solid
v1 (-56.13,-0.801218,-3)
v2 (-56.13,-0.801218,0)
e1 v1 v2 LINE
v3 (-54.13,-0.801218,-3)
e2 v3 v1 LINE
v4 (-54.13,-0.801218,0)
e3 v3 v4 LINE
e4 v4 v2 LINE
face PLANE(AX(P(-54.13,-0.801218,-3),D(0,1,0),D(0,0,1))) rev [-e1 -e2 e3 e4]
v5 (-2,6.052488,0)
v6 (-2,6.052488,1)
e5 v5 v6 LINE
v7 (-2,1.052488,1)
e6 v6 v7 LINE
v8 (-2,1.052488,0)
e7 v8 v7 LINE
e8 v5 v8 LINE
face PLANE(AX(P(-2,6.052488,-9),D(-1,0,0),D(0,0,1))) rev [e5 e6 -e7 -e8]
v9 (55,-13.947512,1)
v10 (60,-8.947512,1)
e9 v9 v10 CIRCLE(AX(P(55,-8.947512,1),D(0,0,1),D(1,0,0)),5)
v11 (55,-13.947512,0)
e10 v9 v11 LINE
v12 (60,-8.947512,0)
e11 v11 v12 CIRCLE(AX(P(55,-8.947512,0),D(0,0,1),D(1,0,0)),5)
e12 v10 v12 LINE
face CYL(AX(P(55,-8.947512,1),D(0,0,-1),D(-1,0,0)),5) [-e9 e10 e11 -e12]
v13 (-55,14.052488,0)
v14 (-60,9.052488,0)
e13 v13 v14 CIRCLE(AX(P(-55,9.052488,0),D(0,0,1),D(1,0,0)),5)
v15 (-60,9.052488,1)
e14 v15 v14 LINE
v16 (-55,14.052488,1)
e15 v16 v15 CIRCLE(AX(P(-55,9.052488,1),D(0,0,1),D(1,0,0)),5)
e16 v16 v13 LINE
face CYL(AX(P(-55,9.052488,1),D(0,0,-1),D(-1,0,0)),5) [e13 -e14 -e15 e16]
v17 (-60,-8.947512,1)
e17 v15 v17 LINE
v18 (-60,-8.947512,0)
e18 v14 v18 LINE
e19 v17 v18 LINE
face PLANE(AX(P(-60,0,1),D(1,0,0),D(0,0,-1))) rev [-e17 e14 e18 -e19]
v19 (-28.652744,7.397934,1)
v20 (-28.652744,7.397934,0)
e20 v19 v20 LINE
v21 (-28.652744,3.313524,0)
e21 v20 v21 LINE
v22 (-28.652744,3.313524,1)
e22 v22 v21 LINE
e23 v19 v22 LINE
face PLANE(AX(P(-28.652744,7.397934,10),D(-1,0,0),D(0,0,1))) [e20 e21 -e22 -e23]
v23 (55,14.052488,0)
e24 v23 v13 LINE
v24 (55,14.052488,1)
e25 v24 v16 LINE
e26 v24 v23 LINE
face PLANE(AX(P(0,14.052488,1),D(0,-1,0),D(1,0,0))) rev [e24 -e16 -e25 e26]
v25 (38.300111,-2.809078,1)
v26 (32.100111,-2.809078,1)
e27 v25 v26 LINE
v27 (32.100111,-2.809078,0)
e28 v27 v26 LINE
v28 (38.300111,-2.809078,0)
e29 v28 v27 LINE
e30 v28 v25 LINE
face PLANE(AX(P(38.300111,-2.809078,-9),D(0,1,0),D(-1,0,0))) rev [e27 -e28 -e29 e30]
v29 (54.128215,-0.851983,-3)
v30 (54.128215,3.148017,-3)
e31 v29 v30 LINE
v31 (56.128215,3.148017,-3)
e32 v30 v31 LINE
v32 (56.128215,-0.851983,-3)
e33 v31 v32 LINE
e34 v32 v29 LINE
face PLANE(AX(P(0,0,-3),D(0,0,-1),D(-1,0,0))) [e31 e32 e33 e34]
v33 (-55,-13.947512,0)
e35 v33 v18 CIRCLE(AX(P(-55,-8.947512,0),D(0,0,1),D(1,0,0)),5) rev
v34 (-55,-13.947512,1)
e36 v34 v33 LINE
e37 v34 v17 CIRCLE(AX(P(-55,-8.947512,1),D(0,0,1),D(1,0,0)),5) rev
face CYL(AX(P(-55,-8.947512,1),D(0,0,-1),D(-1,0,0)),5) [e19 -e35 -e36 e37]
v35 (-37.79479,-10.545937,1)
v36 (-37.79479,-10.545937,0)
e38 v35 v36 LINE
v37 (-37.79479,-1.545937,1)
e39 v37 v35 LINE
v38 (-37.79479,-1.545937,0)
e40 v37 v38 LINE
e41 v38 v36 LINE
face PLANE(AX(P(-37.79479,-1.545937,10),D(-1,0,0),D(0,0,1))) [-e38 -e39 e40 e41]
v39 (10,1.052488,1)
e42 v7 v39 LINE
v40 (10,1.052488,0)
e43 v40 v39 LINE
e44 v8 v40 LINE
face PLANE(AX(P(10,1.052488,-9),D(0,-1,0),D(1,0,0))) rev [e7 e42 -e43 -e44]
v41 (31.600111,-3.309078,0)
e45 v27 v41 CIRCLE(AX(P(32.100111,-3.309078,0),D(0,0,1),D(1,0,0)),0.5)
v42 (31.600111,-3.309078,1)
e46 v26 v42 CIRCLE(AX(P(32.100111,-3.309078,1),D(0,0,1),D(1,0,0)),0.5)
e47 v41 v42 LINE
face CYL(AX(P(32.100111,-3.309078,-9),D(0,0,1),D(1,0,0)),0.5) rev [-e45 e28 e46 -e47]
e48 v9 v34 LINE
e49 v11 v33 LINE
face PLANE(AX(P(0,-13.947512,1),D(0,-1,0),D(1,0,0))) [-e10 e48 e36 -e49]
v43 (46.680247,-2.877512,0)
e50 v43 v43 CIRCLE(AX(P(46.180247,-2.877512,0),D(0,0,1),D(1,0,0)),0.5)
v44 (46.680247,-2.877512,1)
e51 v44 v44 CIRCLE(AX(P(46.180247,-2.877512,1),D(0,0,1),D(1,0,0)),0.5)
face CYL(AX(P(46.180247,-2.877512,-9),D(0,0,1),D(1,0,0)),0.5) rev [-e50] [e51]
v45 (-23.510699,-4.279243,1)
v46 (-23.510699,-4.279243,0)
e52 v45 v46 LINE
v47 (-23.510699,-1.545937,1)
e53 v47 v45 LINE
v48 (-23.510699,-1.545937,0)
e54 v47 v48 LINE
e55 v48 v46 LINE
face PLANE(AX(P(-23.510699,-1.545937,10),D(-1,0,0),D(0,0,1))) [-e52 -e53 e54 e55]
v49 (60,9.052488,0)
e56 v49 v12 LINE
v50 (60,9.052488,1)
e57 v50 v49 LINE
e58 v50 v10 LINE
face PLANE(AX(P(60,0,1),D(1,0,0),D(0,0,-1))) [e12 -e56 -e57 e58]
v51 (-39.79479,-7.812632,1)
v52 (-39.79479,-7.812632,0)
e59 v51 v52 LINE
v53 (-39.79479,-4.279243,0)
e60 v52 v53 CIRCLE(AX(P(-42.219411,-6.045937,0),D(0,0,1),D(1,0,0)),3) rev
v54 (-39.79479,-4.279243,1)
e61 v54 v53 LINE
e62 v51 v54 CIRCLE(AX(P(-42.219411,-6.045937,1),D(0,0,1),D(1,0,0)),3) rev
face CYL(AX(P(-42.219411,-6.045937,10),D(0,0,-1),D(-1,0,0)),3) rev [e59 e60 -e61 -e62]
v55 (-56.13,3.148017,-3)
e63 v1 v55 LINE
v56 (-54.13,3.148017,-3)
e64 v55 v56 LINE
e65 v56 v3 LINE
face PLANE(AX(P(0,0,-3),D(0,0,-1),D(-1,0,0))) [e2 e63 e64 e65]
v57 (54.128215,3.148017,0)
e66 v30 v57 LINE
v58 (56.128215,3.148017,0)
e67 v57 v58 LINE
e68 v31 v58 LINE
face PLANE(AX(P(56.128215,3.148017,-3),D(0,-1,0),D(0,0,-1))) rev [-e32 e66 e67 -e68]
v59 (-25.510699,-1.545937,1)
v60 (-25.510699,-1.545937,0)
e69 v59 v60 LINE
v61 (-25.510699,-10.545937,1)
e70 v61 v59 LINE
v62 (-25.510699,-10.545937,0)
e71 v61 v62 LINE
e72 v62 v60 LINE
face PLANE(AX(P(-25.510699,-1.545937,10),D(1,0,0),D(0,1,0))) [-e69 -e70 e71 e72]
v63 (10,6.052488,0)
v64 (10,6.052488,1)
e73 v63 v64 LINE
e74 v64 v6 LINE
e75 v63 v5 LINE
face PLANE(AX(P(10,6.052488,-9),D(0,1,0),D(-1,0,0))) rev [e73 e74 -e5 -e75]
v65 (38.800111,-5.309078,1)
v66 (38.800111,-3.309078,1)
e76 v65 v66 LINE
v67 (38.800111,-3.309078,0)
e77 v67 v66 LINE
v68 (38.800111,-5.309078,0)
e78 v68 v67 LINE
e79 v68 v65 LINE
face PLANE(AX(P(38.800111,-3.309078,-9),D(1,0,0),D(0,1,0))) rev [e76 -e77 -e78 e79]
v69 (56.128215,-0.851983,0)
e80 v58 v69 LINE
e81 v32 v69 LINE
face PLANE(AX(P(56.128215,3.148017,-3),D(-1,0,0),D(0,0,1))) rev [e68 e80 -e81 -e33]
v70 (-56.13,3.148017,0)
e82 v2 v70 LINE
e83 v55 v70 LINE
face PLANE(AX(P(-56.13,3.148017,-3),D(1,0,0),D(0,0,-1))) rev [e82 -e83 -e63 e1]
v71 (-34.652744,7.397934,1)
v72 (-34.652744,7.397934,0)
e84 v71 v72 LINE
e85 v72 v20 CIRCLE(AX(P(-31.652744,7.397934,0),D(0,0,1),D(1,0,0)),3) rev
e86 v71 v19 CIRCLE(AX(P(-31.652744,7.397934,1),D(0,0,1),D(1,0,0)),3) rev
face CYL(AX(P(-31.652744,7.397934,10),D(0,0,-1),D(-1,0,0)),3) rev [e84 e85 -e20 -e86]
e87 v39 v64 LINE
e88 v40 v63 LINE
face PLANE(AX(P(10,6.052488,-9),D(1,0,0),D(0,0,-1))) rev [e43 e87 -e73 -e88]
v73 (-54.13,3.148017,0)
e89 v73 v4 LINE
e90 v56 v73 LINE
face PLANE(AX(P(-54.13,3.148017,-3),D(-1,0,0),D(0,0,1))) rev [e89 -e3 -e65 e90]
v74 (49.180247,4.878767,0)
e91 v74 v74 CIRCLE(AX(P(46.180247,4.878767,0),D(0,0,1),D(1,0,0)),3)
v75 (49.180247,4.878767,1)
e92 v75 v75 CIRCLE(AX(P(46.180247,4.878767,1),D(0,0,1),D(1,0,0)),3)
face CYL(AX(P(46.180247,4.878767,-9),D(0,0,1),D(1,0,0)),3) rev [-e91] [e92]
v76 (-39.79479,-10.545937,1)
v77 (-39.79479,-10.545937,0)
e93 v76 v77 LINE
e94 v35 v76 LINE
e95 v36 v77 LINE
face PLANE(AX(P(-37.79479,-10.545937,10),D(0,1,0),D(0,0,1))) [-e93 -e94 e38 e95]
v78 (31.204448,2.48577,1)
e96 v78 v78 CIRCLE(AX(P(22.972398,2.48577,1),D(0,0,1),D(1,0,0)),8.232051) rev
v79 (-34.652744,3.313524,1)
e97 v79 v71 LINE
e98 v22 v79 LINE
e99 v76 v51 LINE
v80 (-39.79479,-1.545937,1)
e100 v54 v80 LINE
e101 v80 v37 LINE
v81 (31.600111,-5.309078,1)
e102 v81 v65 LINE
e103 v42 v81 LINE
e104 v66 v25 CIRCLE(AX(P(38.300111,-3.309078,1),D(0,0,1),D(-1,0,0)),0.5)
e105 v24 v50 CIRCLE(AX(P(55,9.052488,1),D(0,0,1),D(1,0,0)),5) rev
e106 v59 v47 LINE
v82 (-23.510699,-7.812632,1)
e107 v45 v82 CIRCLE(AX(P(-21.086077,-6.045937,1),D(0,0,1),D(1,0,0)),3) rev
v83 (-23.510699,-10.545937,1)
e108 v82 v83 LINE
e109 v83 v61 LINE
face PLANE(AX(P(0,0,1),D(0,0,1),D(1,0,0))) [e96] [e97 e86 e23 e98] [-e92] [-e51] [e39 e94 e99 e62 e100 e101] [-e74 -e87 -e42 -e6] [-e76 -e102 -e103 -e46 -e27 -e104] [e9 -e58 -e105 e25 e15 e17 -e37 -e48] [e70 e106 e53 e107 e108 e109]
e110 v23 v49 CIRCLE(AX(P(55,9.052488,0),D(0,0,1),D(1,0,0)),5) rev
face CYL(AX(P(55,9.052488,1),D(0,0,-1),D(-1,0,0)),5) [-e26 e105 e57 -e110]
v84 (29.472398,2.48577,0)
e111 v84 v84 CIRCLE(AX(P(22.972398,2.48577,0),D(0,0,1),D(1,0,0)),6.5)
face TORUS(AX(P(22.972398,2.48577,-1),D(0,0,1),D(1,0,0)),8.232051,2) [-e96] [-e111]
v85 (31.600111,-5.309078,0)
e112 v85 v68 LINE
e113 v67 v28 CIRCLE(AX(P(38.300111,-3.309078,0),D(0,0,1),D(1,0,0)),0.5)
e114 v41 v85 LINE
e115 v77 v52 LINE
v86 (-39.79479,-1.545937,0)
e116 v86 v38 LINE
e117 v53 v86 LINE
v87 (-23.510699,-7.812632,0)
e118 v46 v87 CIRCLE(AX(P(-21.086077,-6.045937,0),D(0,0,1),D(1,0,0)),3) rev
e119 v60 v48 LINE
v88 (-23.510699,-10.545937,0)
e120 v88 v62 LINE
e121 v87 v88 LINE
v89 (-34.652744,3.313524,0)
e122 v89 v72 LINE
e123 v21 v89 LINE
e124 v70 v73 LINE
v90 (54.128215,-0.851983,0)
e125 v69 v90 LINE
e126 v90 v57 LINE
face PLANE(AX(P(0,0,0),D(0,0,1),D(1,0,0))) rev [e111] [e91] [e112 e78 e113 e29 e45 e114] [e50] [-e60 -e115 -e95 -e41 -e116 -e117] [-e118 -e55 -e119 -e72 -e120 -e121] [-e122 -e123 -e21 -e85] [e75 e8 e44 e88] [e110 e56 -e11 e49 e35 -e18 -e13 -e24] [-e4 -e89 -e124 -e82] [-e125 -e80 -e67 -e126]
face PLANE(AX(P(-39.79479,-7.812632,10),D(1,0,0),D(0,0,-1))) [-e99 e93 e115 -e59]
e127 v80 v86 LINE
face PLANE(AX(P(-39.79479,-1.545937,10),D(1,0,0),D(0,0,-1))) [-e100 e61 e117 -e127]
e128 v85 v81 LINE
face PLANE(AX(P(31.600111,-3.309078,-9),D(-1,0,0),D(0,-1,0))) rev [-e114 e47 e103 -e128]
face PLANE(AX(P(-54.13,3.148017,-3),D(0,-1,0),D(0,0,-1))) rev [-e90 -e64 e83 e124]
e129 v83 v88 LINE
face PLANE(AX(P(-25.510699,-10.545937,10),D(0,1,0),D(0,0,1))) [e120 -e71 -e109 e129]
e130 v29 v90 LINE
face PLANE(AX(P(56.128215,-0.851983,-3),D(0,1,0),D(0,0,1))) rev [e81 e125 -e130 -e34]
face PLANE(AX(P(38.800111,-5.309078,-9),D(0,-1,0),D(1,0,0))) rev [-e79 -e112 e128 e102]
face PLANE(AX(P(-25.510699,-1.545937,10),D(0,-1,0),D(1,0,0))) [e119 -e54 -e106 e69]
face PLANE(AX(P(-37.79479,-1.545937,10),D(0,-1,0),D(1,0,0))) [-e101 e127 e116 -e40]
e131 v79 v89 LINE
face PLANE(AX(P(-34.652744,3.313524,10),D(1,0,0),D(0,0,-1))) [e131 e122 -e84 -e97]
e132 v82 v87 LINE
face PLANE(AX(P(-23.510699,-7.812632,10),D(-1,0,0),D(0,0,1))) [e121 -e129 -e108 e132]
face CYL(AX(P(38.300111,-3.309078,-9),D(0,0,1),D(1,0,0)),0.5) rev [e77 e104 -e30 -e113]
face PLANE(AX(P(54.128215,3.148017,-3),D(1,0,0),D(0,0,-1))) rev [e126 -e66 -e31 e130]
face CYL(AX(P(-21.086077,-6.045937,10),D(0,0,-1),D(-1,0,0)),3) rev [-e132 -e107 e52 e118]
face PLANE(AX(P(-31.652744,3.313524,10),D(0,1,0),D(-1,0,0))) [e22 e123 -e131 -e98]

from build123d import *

# Parameters (mm, degrees)
BOSS_EXTRUDE1_DEPTH      = 1
SKETCH11_W               = 12
SKETCH11_H               = 5
CUT_EXTRUDE7_DEPTH       = 10
SKETCH13_R               = 3
CUT_EXTRUDE9_DEPTH       = 10
CUT_EXTRUDE10_DEPTH      = 10
SKETCH21_R               = 6.5
CUT_EXTRUDE11_DEPTH      = 10
CUT_EXTRUDE17_DEPTH      = 10
CUT_EXTRUDE17_DEPTH_BACK = 10
SKETCH23_W               = 2
SKETCH23_H               = 4
BOSS_EXTRUDE2_DEPTH      = 3
SKETCH24_W               = 2
SKETCH24_H               = 3.949234692
BOSS_EXTRUDE3_DEPTH      = 3
FILLET1_R                = 2
SKETCH25_R               = 0.5
CUT_EXTRUDE18_DEPTH      = 10


with BuildPart() as part:
    # Sketch4 → Boss-Extrude1 (new body)
    with BuildSketch(Plane.XY):
        with BuildLine():
            Line((55, 14.052488348), (0, 14.052488348))
            Line((0, 14.052488348), (-55, 14.052488348))
            ThreePointArc((-55, 14.052488348), (-58.535533906, 12.588022254), (-60, 9.052488348))
            Line((-60, 9.052488348), (-60, -8.947511652))
            ThreePointArc((-60, -8.947511652), (-58.535533906, -12.483045558), (-55, -13.947511652))
            Line((-55, -13.947511652), (0, -13.947511652))
            Line((0, -13.947511652), (55, -13.947511652))
            ThreePointArc((55, -13.947511652), (58.535533906, -12.483045558), (60, -8.947511652))
            Line((60, -8.947511652), (60, 9.052488348))
            ThreePointArc((60, 9.052488348), (58.535533906, 12.588022254), (55, 14.052488348))
        make_face()
    extrude(amount=BOSS_EXTRUDE1_DEPTH)

    # Sketch11 → Cut-Extrude7 (cut)
    with BuildSketch(Plane.XY.offset(1)):
        with Locations((4, 3.552488348)):
            Rectangle(SKETCH11_W, SKETCH11_H)
    extrude(amount=-CUT_EXTRUDE7_DEPTH, mode=Mode.SUBTRACT)

    # Sketch13 → Cut-Extrude9 (cut)
    with BuildSketch(Plane.XY.offset(1)):
        with Locations((46.180246868, 4.878767266)):
            Circle(SKETCH13_R)
    extrude(amount=-CUT_EXTRUDE9_DEPTH, mode=Mode.SUBTRACT)

    # Sketch12 → Cut-Extrude10 (cut)
    with BuildSketch(Plane.XY.offset(1)):
        with BuildLine():
            Line((38.300111452, -2.809077948), (32.100111452, -2.809077948))
            ThreePointArc((32.100111452, -2.809077948), (31.746558061, -2.955524558), (31.600111452, -3.309077948))
            Line((31.600111452, -3.309077948), (31.600111452, -5.309077948))
            Line((31.600111452, -5.309077948), (38.800111452, -5.309077948))
            Line((38.800111452, -5.309077948), (38.800111452, -3.309077948))
            ThreePointArc((38.800111452, -3.309077948), (38.653664842, -2.955524558), (38.300111452, -2.809077948))
        make_face()
    extrude(amount=-CUT_EXTRUDE10_DEPTH, mode=Mode.SUBTRACT)

    # Sketch21 → Cut-Extrude11 (cut)
    with BuildSketch(Plane.XY.offset(1)):
        with Locations((22.972397633, 2.485770253)):
            Circle(SKETCH21_R)
    extrude(amount=-CUT_EXTRUDE11_DEPTH, mode=Mode.SUBTRACT)

    # Sketch22 → Cut-Extrude17 (cut, two sides: drawn at the far end of the back side and taken through both)
    with BuildSketch(Plane.XY.offset(-CUT_EXTRUDE17_DEPTH_BACK)):
        with BuildLine():
            Line((-39.794789509, -7.812631563), (-39.794789509, -10.545937078))
            Line((-39.794789509, -10.545937078), (-37.794789509, -10.545937078))
            Line((-37.794789509, -10.545937078), (-37.794789509, -1.545937078))
            Line((-37.794789509, -1.545937078), (-39.794789509, -1.545937078))
            Line((-39.794789509, -1.545937078), (-39.794789509, -4.279242592))
            ThreePointArc((-39.794789509, -4.279242592), (-45.219411252, -6.045937078), (-39.794789509, -7.812631563))
        make_face()
        with BuildLine():
            Line((-25.510698687, -1.545937078), (-23.510698687, -1.545937078))
            Line((-23.510698687, -1.545937078), (-23.510698687, -4.279242592))
            ThreePointArc((-23.510698687, -4.279242592), (-18.086076945, -6.045937078), (-23.510698687, -7.812631563))
            Line((-23.510698687, -7.812631563), (-23.510698687, -10.545937078))
            Line((-23.510698687, -10.545937078), (-25.510698687, -10.545937078))
            Line((-25.510698687, -10.545937078), (-25.510698687, -1.545937078))
        make_face()
        with BuildLine():
            Line((-31.652744098, 3.313523563), (-34.652744098, 3.313523563))
            Line((-34.652744098, 3.313523563), (-34.652744098, 7.397933855))
            ThreePointArc((-34.652744098, 7.397933855), (-31.652744098, 10.397933855), (-28.652744098, 7.397933855))
            Line((-28.652744098, 7.397933855), (-28.652744098, 3.313523563))
            Line((-28.652744098, 3.313523563), (-31.652744098, 3.313523563))
        make_face()
    extrude(amount=CUT_EXTRUDE17_DEPTH + CUT_EXTRUDE17_DEPTH_BACK, mode=Mode.SUBTRACT)

    # Sketch23 → Boss-Extrude2 (add)
    with BuildSketch(Plane(origin=(0, 0, 0), x_dir=(-1, 0, 0), z_dir=(0, 0, -1))):
        with Locations((-55.128215007, 1.148016517)):
            Rectangle(SKETCH23_W, SKETCH23_H)
    extrude(amount=BOSS_EXTRUDE2_DEPTH)

    # Sketch24 → Boss-Extrude3 (add)
    with BuildSketch(Plane(origin=(0, 0, 0), x_dir=(-1, 0, 0), z_dir=(0, 0, -1))):
        with Locations((55.13, 1.173399171)):
            Rectangle(SKETCH24_W, SKETCH24_H)
    extrude(amount=BOSS_EXTRUDE3_DEPTH)

    # Fillet1
    # the kernel refuses this fillet: 2 mm, written as the material it takes off along each edge
    with BuildSketch(Plane(origin=(22.972397633, 2.485770253, 1), x_dir=(1, 0, 0), z_dir=(0, -1, 0))) as fillet1_piece_1:
        with BuildLine():
            CenterArc((8.232050808, -2), FILLET1_R, 90, 60)
            Line((6.5, -1), (6.465358984, -0.98))
            ThreePointArc((6.465358984, -0.98), (6.46, -0.5), (6.46, 0))
            Line((6.46, 0), (6.5, 0.04))
            Line((6.5, 0.04), (8.232050808, 0.04))
            Line((8.232050808, 0.04), (8.232050808, 0))
        make_face()
    revolve(axis=Axis((22.972397633, 2.485770253, 1), (0, 0, 1)), mode=Mode.SUBTRACT)

    # Sketch25 → Cut-Extrude18 (cut)
    with BuildSketch(Plane.XY.offset(1)):
        with Locations((46.180246868, -2.877511652)):
            Circle(SKETCH25_R)
    extrude(amount=-CUT_EXTRUDE18_DEPTH, mode=Mode.SUBTRACT)


solid = part.part
